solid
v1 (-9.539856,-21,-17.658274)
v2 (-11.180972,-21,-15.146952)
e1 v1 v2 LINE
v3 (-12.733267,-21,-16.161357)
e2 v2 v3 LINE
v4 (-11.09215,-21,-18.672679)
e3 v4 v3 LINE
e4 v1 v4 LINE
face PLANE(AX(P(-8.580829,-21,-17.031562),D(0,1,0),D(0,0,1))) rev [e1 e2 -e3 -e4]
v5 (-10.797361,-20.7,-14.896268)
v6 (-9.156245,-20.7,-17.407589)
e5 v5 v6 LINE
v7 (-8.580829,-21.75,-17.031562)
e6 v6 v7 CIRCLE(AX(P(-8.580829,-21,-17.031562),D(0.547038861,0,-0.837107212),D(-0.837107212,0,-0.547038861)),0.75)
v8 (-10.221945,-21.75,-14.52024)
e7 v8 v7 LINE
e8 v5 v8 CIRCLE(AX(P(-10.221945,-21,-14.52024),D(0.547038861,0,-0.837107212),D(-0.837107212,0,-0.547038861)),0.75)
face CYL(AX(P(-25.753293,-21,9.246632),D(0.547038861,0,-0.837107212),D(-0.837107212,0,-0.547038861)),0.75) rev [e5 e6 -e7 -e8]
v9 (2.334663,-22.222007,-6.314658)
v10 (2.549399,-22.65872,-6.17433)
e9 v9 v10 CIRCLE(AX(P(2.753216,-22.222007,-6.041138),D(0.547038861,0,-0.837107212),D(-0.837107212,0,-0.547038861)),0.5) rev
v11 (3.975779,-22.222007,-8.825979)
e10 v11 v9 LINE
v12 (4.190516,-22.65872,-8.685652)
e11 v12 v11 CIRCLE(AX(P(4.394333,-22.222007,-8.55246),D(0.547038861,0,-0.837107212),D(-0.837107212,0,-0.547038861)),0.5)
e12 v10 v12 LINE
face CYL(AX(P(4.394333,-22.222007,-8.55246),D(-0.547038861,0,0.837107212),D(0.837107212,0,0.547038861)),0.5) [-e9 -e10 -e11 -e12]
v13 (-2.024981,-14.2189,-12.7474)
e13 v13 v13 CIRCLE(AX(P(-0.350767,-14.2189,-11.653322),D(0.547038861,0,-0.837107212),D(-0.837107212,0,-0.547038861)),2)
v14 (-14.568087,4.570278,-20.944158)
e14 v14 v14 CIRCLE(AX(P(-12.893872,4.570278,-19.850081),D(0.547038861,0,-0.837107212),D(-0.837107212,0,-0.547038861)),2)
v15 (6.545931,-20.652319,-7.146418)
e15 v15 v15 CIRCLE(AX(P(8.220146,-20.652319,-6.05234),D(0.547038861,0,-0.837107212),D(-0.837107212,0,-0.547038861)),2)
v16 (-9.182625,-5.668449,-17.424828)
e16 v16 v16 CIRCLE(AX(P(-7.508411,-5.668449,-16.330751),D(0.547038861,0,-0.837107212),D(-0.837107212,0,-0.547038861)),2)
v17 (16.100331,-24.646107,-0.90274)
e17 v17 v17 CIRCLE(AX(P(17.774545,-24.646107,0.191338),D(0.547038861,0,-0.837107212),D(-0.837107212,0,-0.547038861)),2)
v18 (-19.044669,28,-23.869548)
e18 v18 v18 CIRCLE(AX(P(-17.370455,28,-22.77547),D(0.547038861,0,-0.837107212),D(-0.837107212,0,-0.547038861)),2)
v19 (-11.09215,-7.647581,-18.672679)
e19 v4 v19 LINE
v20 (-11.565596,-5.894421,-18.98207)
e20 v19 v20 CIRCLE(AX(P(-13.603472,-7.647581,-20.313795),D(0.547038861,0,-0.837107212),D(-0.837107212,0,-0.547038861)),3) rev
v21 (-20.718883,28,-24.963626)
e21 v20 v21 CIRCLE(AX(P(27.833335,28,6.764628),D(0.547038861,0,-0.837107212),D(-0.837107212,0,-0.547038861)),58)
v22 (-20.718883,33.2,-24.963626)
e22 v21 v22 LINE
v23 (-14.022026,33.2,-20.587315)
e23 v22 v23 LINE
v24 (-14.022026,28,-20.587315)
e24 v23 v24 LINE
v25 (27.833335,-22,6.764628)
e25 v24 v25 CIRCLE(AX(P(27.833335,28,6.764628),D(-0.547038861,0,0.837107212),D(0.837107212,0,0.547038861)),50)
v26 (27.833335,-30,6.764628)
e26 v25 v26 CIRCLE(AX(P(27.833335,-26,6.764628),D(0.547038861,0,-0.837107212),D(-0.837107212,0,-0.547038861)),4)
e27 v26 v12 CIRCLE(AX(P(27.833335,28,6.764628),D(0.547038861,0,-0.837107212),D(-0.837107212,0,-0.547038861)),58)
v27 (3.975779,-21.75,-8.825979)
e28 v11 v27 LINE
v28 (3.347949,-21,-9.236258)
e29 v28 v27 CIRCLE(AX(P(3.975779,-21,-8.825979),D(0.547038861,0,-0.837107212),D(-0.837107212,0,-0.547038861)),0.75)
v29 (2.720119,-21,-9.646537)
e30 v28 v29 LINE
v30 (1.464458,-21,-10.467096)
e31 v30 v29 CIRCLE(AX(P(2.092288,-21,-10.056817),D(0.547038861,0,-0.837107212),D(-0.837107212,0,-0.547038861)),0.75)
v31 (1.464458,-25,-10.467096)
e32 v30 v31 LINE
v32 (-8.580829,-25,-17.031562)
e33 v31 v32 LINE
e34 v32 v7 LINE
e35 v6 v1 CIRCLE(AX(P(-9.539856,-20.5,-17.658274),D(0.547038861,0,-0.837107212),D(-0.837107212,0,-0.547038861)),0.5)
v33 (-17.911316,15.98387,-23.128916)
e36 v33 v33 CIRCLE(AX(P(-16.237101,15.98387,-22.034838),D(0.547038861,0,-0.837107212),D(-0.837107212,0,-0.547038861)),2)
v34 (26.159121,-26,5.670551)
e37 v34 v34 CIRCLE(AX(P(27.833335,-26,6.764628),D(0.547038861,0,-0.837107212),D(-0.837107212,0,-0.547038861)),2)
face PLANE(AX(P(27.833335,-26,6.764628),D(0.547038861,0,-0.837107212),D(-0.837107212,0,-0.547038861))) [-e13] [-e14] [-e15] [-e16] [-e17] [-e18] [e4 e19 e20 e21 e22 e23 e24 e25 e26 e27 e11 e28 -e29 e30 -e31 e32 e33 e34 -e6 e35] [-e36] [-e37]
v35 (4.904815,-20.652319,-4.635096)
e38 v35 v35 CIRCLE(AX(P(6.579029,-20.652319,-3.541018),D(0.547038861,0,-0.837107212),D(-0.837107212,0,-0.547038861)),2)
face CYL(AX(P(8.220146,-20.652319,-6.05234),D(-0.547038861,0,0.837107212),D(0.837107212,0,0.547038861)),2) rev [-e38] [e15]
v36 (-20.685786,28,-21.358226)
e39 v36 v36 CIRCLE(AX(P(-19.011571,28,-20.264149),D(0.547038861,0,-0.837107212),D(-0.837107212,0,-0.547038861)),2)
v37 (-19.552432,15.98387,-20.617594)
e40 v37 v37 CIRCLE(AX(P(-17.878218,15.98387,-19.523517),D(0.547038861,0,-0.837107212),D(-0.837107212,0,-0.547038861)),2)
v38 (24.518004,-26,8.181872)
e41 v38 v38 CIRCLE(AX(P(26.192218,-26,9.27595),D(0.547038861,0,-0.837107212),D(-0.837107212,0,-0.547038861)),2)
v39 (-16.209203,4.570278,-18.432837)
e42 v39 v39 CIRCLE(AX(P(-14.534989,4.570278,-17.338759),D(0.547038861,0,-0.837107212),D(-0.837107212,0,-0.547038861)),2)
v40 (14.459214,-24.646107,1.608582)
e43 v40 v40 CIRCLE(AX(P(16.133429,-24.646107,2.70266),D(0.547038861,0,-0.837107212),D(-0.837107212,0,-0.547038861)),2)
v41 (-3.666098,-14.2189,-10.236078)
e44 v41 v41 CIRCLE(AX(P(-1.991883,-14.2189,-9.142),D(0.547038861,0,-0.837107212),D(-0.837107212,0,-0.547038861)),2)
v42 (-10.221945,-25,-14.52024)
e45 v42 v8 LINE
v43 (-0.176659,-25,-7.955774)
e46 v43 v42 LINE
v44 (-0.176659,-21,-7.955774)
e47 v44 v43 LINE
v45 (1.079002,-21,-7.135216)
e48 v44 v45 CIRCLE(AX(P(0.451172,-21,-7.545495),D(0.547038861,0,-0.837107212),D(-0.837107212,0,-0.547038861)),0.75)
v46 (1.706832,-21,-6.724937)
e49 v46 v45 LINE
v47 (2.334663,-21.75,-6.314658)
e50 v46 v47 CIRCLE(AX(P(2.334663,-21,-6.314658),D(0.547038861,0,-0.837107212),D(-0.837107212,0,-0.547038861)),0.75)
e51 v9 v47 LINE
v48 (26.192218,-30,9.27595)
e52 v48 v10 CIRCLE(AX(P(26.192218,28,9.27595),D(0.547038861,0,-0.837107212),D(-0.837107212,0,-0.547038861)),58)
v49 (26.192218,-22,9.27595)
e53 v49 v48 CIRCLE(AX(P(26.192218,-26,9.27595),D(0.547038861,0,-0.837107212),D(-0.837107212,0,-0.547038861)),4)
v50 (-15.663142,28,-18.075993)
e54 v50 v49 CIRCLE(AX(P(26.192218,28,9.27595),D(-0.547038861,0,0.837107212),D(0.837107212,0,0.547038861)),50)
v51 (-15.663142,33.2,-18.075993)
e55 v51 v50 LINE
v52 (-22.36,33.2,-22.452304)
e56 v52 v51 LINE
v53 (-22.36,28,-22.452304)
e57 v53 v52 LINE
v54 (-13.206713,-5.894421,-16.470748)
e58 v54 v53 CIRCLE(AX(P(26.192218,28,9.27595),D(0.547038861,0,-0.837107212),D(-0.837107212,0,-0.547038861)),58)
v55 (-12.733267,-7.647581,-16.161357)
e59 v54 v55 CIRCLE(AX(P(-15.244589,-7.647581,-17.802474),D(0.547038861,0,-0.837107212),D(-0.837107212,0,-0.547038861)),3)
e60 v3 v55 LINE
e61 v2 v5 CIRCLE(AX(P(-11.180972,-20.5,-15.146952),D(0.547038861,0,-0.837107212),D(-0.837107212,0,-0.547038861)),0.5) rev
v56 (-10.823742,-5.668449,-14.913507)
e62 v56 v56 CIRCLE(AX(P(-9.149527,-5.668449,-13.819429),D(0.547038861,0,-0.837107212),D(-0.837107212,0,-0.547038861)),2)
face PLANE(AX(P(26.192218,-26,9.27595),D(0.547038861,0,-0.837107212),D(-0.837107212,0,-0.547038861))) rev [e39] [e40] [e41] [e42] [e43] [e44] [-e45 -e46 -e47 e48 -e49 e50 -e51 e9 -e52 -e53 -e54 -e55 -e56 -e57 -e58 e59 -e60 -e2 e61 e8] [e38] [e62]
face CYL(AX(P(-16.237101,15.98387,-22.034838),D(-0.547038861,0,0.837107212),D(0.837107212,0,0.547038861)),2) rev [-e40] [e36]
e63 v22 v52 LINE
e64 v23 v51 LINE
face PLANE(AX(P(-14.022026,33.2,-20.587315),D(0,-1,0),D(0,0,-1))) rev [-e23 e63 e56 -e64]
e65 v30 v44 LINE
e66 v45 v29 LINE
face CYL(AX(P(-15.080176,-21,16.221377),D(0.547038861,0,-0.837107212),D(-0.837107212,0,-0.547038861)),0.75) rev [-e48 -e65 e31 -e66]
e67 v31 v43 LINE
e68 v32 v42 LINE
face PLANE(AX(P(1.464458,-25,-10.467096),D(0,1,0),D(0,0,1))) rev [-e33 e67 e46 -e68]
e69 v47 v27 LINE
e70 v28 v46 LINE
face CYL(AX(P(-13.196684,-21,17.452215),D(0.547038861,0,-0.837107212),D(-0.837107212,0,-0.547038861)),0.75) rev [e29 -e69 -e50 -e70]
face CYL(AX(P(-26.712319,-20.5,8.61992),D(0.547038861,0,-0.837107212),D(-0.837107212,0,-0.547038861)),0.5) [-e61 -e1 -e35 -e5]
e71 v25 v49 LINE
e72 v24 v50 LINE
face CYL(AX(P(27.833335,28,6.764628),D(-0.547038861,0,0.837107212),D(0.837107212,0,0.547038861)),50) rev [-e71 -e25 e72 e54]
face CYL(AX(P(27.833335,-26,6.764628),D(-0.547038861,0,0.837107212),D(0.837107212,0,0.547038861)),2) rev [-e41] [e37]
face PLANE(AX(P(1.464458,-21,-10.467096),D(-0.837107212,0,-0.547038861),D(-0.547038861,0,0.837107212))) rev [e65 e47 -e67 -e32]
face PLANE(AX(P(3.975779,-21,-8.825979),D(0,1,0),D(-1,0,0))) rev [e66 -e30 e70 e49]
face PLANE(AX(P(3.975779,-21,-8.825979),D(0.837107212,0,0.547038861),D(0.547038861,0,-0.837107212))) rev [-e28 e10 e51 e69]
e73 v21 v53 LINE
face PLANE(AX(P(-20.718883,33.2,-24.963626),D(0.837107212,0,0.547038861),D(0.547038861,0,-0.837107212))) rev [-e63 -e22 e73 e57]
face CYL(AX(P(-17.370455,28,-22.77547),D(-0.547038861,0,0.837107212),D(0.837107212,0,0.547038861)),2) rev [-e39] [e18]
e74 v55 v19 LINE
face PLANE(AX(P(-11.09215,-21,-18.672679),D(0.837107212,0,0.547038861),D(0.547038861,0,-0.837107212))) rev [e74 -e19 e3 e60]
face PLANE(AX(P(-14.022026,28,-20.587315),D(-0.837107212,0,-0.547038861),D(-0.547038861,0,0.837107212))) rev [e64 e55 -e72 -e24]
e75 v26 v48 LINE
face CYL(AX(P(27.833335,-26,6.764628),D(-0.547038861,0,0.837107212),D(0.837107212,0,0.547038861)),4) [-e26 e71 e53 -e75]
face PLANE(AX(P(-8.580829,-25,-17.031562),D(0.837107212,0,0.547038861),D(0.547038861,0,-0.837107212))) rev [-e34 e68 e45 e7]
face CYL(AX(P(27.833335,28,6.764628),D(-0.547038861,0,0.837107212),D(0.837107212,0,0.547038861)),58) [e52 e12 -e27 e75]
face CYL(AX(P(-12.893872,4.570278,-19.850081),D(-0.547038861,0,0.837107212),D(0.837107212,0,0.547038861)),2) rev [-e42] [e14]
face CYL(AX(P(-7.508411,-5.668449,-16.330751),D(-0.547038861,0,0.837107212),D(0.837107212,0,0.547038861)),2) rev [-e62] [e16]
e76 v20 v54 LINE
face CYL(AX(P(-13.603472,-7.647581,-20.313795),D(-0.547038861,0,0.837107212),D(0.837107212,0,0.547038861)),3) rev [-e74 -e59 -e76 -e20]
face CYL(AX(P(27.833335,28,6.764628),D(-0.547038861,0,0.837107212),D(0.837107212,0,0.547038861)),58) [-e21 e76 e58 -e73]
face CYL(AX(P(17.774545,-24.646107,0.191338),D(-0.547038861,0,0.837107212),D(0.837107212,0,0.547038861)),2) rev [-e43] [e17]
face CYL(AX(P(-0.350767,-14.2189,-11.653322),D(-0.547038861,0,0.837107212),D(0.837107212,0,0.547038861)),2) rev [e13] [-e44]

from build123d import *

# Parameters (mm, degrees)
EXTRUDE_1_OUTLINE_R = 2
EXTRUDE_1_DEPTH     = 5.1
SKETCH_4_2_R        = 2
CUT_EXTRUDE_1_DEPTH = 2.1
SKETCH_5_R          = 0.75
CUT_EXTRUDE_2_DEPTH = 48.355992497
FILLET_1_R          = 0.5
FILLET_2_R          = 3


with BuildPart() as part:
    # 凸台-拉伸1: read off the stored shape, not the designer's step
    # 凸台-拉伸1 outline → 凸台-拉伸1 (new body)
    with BuildSketch(Plane(origin=(15.11890087, 0, 4.548317805), x_dir=(-0.8371072123201975, 0, -0.5470388606685158), z_dir=(0.5470388606685158, 0, -0.8371072123201975))):
        with BuildLine():
            ThreePointArc((-11.855752449, -22), (-15.855752449, -26), (-11.855752449, -30))
            ThreePointArc((-11.855752449, -30), (2.877521805, -28.097510014), (16.644247551, -22.514849302))
            Line((16.644247551, -22.514849302), (16.644247551, -21))
            Line((16.644247551, -21), (19.644247551, -21))
            Line((19.644247551, -21), (19.644247551, -25))
            Line((19.644247551, -25), (31.644247551, -25))
            Line((31.644247551, -25), (31.644247551, -21))
            Line((31.644247551, -21), (34.644247551, -21))
            Line((34.644247551, -21), (34.644247551, -6.666266023))
            ThreePointArc((34.644247551, -6.666266023), (43.194224844, 9.738017632), (46.144247551, 28))
            Line((46.144247551, 28), (46.144247551, 33.2))
            Line((46.144247551, 33.2), (38.144247551, 33.2))
            Line((38.144247551, 33.2), (38.144247551, 28))
            ThreePointArc((38.144247551, 28), (23.49958661, -7.355339059), (-11.855752449, -22))
        make_face()
        with Locations((-11.855752449, -26)):
            Circle(EXTRUDE_1_OUTLINE_R, mode=Mode.SUBTRACT)
        with Locations((0.160377984, -24.646107258)):
            Circle(EXTRUDE_1_OUTLINE_R, mode=Mode.SUBTRACT)
        with Locations((11.573969463, -20.652318867)):
            Circle(EXTRUDE_1_OUTLINE_R, mode=Mode.SUBTRACT)
        with Locations((21.812696851, -14.218900053)):
            Circle(EXTRUDE_1_OUTLINE_R, mode=Mode.SUBTRACT)
        with Locations((30.363147604, -5.6684493)):
            Circle(EXTRUDE_1_OUTLINE_R, mode=Mode.SUBTRACT)
        with Locations((36.796566418, 4.570278088)):
            Circle(EXTRUDE_1_OUTLINE_R, mode=Mode.SUBTRACT)
        with Locations((40.790354809, 15.983869566)):
            Circle(EXTRUDE_1_OUTLINE_R, mode=Mode.SUBTRACT)
        with Locations((42.144247551, 28)):
            Circle(EXTRUDE_1_OUTLINE_R, mode=Mode.SUBTRACT)
    extrude(amount=EXTRUDE_1_DEPTH)

    # 草图4<2> → 切除-拉伸1 (cut)
    with BuildSketch(Plane(origin=(15.11890087, 0, 4.548317805), x_dir=(-0.8371072123201975, 0, -0.5470388606685158), z_dir=(0.5470388606685158, 0, -0.8371072123201975))):
        with BuildLine():
            Line((19.644247551, -21), (19.644247551, -25))
            Line((19.644247551, -25), (31.644247551, -25))
            Line((31.644247551, -25), (31.644247551, -21))
            Line((31.644247551, -21), (34.644247551, -21))
            Line((34.644247551, -21), (34.644247551, -6.666266023))
            ThreePointArc((34.644247551, -6.666266023), (43.194224844, 9.738017632), (46.144247551, 28))
            Line((46.144247551, 28), (46.144247551, 33.2))
            Line((46.144247551, 33.2), (38.144247551, 33.2))
            Line((38.144247551, 33.2), (38.144247551, 28))
            ThreePointArc((38.144247551, 28), (23.49958661, -7.355339059), (-11.855752449, -22))
            ThreePointArc((-11.855752449, -22), (-15.855752449, -26), (-11.855752449, -30))
            ThreePointArc((-11.855752449, -30), (2.877521805, -28.097510014), (16.644247551, -22.514849302))
            Line((16.644247551, -22.514849302), (16.644247551, -21))
            Line((16.644247551, -21), (19.644247551, -21))
        make_face()
        with Locations((42.144247551, 28)):
            Circle(SKETCH_4_2_R, mode=Mode.SUBTRACT)
        with Locations((40.790354809, 15.983869566)):
            Circle(SKETCH_4_2_R, mode=Mode.SUBTRACT)
        with Locations((36.796566418, 4.570278088)):
            Circle(SKETCH_4_2_R, mode=Mode.SUBTRACT)
        with Locations((30.363147604, -5.6684493)):
            Circle(SKETCH_4_2_R, mode=Mode.SUBTRACT)
        with Locations((21.812696851, -14.218900053)):
            Circle(SKETCH_4_2_R, mode=Mode.SUBTRACT)
        with Locations((11.573969463, -20.652318867)):
            Circle(SKETCH_4_2_R, mode=Mode.SUBTRACT)
        with Locations((0.160377984, -24.646107258)):
            Circle(SKETCH_4_2_R, mode=Mode.SUBTRACT)
        with Locations((-11.855752449, -26)):
            Circle(SKETCH_4_2_R, mode=Mode.SUBTRACT)
    extrude(amount=CUT_EXTRUDE_1_DEPTH, mode=Mode.SUBTRACT)

    # 草图5 → 切除-拉伸2 (cut, through all)
    with BuildSketch(Plane(origin=(5.23144021, 0, -8.005420904), x_dir=(-0.8371072123201976, 0, -0.5470388606685158), z_dir=(0.5470388606685158, 0, -0.8371072123201976))):
        with Locations((3.75, -21)):
            Circle(SKETCH_5_R)
        with Locations((16.5, -21)):
            Circle(SKETCH_5_R)
        with Locations((1.5, -21)):
            Circle(SKETCH_5_R)
    extrude(amount=-CUT_EXTRUDE_2_DEPTH, mode=Mode.SUBTRACT)

    # 圆角1
    fillet_1_edges = [part.edges().sort_by_distance(p)[0] for p in [
        (-10.029217494, -21, -16.186180432),
        (3.1552211, -22.514849302, -7.570318376),
    ]]
    fillet(fillet_1_edges, radius=FILLET_1_R)

    # 圆角2
    fillet_2_edges = [part.edges().sort_by_distance(p)[0] for p in [
        (-11.912708722, -6.666266023, -17.417017868),
    ]]
    fillet(fillet_2_edges, radius=FILLET_2_R)


solid = part.part
